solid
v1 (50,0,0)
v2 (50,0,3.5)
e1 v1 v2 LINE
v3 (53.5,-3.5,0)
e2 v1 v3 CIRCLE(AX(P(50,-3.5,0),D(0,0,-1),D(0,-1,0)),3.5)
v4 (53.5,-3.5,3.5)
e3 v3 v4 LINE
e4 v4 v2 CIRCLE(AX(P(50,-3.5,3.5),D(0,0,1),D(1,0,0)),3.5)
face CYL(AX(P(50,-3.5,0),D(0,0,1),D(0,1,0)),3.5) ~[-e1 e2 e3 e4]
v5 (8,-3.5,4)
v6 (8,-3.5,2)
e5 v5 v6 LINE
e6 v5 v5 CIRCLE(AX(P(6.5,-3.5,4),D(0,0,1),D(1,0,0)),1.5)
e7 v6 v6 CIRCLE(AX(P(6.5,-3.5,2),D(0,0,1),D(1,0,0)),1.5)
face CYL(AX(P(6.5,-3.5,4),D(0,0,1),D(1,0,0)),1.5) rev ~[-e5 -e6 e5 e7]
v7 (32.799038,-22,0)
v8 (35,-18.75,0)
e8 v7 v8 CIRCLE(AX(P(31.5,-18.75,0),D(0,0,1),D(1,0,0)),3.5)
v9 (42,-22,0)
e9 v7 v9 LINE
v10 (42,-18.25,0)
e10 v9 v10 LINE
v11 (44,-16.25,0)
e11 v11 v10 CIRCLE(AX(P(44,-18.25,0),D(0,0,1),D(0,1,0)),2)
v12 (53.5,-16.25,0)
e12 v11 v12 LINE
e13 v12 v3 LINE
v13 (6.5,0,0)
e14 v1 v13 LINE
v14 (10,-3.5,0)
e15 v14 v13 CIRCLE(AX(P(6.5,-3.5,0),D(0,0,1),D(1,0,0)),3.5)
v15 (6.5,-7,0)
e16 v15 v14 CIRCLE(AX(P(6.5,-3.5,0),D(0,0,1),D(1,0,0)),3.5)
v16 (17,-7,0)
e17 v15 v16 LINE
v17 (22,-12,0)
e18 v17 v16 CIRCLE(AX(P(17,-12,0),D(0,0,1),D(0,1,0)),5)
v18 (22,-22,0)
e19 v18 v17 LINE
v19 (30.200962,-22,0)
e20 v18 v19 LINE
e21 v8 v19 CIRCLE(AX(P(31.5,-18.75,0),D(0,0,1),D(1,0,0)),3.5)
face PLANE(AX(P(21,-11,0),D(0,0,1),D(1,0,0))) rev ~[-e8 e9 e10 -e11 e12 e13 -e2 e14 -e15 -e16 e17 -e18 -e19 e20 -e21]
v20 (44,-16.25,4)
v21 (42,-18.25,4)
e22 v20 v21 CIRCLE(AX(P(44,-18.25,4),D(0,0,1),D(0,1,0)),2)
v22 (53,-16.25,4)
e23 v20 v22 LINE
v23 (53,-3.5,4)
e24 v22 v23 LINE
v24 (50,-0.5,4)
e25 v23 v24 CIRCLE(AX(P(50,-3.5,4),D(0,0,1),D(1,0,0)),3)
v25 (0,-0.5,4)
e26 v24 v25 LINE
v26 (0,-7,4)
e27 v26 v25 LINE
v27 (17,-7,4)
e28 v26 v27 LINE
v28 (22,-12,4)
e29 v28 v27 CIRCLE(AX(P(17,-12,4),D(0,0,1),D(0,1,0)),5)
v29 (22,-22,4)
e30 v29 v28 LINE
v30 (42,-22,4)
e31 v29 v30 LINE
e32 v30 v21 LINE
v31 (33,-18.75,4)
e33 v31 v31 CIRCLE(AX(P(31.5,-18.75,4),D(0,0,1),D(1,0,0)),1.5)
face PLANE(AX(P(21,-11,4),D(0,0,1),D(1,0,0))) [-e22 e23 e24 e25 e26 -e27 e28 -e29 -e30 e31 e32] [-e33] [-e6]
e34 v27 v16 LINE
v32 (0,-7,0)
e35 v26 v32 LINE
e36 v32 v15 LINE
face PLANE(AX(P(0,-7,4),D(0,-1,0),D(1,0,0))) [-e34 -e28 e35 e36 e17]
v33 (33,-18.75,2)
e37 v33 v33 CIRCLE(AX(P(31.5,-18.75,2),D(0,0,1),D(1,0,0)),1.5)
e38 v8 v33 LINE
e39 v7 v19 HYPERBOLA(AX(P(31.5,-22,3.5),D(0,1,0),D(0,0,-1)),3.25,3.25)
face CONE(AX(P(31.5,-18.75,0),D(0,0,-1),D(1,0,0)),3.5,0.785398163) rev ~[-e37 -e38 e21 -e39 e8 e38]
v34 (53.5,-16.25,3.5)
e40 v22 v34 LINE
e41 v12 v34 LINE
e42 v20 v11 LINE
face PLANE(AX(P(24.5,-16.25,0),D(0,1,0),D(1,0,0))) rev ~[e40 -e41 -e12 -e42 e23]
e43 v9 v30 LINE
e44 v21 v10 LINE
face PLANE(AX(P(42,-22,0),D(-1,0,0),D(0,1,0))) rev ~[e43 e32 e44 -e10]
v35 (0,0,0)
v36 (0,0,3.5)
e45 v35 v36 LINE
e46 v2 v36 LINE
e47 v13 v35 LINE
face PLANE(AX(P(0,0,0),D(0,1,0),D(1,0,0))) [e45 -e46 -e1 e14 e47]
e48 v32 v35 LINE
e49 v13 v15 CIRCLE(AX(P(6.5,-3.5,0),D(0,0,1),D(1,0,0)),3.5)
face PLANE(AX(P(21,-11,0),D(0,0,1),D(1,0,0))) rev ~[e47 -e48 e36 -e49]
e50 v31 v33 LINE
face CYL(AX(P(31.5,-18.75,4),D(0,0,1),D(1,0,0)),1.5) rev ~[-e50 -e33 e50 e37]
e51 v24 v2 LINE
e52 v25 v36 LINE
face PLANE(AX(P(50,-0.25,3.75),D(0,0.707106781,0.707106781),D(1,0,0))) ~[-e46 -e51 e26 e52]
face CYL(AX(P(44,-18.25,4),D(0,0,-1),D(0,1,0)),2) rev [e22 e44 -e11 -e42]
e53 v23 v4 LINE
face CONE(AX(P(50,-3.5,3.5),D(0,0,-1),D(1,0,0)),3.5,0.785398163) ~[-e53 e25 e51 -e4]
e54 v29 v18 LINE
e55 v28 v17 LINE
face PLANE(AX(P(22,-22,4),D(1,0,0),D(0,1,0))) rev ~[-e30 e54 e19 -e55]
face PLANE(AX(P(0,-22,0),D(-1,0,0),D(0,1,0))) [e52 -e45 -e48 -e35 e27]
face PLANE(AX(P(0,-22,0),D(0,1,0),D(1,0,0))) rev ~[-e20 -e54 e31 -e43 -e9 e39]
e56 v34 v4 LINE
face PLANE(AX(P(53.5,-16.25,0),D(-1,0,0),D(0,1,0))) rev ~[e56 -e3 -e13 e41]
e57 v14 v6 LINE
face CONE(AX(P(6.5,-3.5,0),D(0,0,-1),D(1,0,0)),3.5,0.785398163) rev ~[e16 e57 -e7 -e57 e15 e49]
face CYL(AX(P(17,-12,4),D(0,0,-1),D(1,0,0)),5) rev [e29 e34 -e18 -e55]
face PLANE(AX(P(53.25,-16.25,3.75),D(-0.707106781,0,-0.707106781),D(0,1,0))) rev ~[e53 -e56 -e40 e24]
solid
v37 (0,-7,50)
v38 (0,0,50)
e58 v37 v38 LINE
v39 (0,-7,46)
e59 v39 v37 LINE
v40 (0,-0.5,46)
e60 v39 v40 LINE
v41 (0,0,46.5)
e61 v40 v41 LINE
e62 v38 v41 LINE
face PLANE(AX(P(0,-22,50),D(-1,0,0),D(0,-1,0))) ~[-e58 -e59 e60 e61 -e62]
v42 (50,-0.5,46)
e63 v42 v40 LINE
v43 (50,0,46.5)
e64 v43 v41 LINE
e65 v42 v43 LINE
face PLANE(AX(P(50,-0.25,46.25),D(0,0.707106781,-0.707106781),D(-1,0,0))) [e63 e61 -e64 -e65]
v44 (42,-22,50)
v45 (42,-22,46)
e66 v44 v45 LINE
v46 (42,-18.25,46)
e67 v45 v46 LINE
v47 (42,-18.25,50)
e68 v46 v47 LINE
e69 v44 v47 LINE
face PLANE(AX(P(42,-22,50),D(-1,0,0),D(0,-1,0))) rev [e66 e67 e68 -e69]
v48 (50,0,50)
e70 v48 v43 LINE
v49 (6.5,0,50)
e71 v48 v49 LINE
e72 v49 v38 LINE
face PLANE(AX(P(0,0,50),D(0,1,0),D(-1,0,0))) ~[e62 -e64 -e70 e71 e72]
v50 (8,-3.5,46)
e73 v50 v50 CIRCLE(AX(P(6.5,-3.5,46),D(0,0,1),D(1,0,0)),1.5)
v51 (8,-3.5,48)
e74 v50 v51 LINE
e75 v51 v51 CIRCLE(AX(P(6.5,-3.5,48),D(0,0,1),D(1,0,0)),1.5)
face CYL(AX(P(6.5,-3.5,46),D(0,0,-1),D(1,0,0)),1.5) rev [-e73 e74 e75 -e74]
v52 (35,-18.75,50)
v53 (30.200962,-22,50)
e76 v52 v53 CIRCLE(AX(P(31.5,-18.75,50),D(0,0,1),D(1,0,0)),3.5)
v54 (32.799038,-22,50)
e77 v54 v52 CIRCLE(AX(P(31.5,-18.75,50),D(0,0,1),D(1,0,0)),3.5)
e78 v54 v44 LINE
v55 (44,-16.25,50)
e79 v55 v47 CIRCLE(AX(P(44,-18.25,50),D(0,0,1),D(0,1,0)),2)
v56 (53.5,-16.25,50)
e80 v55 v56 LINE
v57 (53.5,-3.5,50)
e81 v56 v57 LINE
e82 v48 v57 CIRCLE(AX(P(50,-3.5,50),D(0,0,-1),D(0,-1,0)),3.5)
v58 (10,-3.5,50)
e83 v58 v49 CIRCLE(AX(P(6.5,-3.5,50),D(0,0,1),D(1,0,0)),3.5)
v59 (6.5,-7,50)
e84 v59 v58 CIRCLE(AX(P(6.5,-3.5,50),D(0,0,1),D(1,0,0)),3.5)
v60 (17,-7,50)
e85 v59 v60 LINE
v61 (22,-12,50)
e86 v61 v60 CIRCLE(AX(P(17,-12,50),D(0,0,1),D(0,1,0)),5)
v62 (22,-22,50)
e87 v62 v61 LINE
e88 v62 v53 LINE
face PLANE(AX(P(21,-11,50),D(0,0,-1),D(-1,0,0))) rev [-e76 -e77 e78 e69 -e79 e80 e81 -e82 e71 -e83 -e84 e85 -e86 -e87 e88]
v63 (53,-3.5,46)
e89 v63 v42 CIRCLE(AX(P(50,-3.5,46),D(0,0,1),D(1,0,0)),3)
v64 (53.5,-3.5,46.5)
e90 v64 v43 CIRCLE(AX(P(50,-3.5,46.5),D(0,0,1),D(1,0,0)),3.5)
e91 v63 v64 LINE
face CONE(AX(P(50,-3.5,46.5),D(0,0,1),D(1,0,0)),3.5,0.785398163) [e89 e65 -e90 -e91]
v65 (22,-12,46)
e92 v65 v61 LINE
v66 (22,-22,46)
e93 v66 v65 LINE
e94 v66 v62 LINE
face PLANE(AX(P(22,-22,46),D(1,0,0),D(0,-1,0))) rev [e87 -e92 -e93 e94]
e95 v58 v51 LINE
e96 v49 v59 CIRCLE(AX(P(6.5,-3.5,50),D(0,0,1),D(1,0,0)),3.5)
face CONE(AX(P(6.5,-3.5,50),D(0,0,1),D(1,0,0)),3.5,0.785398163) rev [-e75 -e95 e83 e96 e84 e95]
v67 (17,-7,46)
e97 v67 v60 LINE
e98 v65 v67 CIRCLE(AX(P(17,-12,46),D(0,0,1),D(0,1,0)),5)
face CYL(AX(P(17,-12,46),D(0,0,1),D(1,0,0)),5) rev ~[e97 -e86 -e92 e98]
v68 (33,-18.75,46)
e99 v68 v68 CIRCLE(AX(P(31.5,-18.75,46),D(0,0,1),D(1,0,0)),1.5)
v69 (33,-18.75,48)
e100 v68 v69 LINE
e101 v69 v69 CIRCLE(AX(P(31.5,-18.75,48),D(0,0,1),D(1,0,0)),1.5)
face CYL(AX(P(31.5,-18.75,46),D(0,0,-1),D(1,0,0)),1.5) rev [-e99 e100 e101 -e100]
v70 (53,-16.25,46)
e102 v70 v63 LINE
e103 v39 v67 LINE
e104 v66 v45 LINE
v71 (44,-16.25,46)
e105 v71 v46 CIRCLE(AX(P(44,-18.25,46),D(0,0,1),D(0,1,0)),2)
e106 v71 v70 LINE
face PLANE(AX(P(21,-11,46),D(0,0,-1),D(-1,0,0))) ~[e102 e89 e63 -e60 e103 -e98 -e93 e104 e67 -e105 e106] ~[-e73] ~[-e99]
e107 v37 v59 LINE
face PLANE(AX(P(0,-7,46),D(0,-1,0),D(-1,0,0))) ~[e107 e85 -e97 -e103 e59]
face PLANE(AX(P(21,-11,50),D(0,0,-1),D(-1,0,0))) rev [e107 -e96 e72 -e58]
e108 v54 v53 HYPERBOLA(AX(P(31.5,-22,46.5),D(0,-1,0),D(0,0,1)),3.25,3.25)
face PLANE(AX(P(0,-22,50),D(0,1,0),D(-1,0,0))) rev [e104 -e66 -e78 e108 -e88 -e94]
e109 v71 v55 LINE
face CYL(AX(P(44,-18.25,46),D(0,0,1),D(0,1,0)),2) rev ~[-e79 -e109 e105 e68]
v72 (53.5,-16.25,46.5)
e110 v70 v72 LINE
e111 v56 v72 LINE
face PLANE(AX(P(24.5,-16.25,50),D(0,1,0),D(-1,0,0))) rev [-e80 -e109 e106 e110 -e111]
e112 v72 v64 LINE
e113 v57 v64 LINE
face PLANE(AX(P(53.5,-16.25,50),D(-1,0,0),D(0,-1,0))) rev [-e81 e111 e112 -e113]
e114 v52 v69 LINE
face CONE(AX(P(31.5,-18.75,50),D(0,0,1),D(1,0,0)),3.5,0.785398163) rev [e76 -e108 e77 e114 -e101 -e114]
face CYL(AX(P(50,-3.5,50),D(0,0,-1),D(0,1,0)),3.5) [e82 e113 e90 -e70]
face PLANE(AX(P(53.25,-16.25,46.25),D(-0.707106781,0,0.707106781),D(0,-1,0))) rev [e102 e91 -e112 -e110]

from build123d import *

# Parameters (mm, degrees)
F0_W      = 42
F0_H      = 22
F1_DEPTH  = 4
F2_W      = 29
F2_H      = 16.25
F3_DEPTH  = 4
F4_R      = 3.5
F5_R      = 2
F6_R      = 1.5
F7_DEPTH  = 25
F8_W      = 22
F8_H      = 15
F9_DEPTH  = 25
F10_R     = 5
F11_R     = 1.5
F12_DEPTH = 25
F15_SIZE  = 0.5


# Not quite as in the source:
# - a fillet or chamfer that OpenCascade refuses, or shapes differently, is made with other operations: its cross-section is extruded or revolved along the edge and cut away or added


with BuildPart() as f1:
    # F0 (on Top) → F1 (new body)
    with BuildSketch(Plane.XY):
        with Locations((21, -11)):
            Rectangle(F0_W, F0_H)
    extrude(amount=F1_DEPTH)

    # F2 (on Top) → F3 (join)
    with BuildSketch(Plane.XY):
        with Locations((39, -8.125)):
            Rectangle(F2_W, F2_H)
    extrude(amount=F3_DEPTH)

    # F4
    f4_edges = [f1.edges().sort_by_distance(p)[0] for p in [
        (53.5, 0, 2),
    ]]
    fillet(f4_edges, radius=F4_R)

    # F5
    f5_edges = [f1.edges().sort_by_distance(p)[0] for p in [
        (42, -16.25, 2),
    ]]
    fillet(f5_edges, radius=F5_R)

    # F6 (on face) → F7 (cut)
    with BuildSketch(Plane.XY.offset(4)):
        with Locations((6.5, -3.5)):
            Circle(F6_R)
    extrude(amount=-F7_DEPTH, mode=Mode.SUBTRACT)

    # F8 (on face) → F9 (cut)
    with BuildSketch(Plane.XY.offset(4)):
        with Locations((11, -14.5)):
            Rectangle(F8_W, F8_H)
    extrude(amount=-F9_DEPTH, mode=Mode.SUBTRACT)

    # F10
    f10_edges = [f1.edges().sort_by_distance(p)[0] for p in [
        (22, -7, 2),
    ]]
    fillet(f10_edges, radius=F10_R)

    # F11 (on face) → F12 (cut)
    with BuildSketch(Plane.XY.offset(4)):
        with Locations((31.5, -18.75)):
            Circle(F11_R)
    extrude(amount=-F12_DEPTH, mode=Mode.SUBTRACT)

    # F14: chamfer of 2 on 2 edges, made by hand

    # F14_s1 → F14_t2 (revolve, cut)
    with BuildSketch(Plane.XZ.offset(18.75)):
        Polygon((35, 0), (33, 2), (33, 0), align=None)
    revolve(axis=Axis((31.5, -18.75, 0), (0, 0, 1)), mode=Mode.SUBTRACT)

    # F14_s3 → F14_t4 (revolve, cut)
    with BuildSketch(Plane.XZ.offset(3.5)):
        Polygon((10, 0), (8, 2), (8, 0), align=None)
    revolve(axis=Axis((6.5, -3.5, 0), (0, 0, 1)), mode=Mode.SUBTRACT)

    # F15
    f15_edges = [f1.edges().sort_by_distance(p)[0] for p in [
        (53.5, -9.875, 4),
        (52.474874, -1.025126, 4),
        (25, 0, 4),
    ]]
    chamfer(f15_edges, length=F15_SIZE)


with BuildPart() as f16_1:
    # F16: instance of F1
    add(f1.part.mirror(Plane.XY.offset(25)))


solid = Compound([f1.part, f16_1.part])
